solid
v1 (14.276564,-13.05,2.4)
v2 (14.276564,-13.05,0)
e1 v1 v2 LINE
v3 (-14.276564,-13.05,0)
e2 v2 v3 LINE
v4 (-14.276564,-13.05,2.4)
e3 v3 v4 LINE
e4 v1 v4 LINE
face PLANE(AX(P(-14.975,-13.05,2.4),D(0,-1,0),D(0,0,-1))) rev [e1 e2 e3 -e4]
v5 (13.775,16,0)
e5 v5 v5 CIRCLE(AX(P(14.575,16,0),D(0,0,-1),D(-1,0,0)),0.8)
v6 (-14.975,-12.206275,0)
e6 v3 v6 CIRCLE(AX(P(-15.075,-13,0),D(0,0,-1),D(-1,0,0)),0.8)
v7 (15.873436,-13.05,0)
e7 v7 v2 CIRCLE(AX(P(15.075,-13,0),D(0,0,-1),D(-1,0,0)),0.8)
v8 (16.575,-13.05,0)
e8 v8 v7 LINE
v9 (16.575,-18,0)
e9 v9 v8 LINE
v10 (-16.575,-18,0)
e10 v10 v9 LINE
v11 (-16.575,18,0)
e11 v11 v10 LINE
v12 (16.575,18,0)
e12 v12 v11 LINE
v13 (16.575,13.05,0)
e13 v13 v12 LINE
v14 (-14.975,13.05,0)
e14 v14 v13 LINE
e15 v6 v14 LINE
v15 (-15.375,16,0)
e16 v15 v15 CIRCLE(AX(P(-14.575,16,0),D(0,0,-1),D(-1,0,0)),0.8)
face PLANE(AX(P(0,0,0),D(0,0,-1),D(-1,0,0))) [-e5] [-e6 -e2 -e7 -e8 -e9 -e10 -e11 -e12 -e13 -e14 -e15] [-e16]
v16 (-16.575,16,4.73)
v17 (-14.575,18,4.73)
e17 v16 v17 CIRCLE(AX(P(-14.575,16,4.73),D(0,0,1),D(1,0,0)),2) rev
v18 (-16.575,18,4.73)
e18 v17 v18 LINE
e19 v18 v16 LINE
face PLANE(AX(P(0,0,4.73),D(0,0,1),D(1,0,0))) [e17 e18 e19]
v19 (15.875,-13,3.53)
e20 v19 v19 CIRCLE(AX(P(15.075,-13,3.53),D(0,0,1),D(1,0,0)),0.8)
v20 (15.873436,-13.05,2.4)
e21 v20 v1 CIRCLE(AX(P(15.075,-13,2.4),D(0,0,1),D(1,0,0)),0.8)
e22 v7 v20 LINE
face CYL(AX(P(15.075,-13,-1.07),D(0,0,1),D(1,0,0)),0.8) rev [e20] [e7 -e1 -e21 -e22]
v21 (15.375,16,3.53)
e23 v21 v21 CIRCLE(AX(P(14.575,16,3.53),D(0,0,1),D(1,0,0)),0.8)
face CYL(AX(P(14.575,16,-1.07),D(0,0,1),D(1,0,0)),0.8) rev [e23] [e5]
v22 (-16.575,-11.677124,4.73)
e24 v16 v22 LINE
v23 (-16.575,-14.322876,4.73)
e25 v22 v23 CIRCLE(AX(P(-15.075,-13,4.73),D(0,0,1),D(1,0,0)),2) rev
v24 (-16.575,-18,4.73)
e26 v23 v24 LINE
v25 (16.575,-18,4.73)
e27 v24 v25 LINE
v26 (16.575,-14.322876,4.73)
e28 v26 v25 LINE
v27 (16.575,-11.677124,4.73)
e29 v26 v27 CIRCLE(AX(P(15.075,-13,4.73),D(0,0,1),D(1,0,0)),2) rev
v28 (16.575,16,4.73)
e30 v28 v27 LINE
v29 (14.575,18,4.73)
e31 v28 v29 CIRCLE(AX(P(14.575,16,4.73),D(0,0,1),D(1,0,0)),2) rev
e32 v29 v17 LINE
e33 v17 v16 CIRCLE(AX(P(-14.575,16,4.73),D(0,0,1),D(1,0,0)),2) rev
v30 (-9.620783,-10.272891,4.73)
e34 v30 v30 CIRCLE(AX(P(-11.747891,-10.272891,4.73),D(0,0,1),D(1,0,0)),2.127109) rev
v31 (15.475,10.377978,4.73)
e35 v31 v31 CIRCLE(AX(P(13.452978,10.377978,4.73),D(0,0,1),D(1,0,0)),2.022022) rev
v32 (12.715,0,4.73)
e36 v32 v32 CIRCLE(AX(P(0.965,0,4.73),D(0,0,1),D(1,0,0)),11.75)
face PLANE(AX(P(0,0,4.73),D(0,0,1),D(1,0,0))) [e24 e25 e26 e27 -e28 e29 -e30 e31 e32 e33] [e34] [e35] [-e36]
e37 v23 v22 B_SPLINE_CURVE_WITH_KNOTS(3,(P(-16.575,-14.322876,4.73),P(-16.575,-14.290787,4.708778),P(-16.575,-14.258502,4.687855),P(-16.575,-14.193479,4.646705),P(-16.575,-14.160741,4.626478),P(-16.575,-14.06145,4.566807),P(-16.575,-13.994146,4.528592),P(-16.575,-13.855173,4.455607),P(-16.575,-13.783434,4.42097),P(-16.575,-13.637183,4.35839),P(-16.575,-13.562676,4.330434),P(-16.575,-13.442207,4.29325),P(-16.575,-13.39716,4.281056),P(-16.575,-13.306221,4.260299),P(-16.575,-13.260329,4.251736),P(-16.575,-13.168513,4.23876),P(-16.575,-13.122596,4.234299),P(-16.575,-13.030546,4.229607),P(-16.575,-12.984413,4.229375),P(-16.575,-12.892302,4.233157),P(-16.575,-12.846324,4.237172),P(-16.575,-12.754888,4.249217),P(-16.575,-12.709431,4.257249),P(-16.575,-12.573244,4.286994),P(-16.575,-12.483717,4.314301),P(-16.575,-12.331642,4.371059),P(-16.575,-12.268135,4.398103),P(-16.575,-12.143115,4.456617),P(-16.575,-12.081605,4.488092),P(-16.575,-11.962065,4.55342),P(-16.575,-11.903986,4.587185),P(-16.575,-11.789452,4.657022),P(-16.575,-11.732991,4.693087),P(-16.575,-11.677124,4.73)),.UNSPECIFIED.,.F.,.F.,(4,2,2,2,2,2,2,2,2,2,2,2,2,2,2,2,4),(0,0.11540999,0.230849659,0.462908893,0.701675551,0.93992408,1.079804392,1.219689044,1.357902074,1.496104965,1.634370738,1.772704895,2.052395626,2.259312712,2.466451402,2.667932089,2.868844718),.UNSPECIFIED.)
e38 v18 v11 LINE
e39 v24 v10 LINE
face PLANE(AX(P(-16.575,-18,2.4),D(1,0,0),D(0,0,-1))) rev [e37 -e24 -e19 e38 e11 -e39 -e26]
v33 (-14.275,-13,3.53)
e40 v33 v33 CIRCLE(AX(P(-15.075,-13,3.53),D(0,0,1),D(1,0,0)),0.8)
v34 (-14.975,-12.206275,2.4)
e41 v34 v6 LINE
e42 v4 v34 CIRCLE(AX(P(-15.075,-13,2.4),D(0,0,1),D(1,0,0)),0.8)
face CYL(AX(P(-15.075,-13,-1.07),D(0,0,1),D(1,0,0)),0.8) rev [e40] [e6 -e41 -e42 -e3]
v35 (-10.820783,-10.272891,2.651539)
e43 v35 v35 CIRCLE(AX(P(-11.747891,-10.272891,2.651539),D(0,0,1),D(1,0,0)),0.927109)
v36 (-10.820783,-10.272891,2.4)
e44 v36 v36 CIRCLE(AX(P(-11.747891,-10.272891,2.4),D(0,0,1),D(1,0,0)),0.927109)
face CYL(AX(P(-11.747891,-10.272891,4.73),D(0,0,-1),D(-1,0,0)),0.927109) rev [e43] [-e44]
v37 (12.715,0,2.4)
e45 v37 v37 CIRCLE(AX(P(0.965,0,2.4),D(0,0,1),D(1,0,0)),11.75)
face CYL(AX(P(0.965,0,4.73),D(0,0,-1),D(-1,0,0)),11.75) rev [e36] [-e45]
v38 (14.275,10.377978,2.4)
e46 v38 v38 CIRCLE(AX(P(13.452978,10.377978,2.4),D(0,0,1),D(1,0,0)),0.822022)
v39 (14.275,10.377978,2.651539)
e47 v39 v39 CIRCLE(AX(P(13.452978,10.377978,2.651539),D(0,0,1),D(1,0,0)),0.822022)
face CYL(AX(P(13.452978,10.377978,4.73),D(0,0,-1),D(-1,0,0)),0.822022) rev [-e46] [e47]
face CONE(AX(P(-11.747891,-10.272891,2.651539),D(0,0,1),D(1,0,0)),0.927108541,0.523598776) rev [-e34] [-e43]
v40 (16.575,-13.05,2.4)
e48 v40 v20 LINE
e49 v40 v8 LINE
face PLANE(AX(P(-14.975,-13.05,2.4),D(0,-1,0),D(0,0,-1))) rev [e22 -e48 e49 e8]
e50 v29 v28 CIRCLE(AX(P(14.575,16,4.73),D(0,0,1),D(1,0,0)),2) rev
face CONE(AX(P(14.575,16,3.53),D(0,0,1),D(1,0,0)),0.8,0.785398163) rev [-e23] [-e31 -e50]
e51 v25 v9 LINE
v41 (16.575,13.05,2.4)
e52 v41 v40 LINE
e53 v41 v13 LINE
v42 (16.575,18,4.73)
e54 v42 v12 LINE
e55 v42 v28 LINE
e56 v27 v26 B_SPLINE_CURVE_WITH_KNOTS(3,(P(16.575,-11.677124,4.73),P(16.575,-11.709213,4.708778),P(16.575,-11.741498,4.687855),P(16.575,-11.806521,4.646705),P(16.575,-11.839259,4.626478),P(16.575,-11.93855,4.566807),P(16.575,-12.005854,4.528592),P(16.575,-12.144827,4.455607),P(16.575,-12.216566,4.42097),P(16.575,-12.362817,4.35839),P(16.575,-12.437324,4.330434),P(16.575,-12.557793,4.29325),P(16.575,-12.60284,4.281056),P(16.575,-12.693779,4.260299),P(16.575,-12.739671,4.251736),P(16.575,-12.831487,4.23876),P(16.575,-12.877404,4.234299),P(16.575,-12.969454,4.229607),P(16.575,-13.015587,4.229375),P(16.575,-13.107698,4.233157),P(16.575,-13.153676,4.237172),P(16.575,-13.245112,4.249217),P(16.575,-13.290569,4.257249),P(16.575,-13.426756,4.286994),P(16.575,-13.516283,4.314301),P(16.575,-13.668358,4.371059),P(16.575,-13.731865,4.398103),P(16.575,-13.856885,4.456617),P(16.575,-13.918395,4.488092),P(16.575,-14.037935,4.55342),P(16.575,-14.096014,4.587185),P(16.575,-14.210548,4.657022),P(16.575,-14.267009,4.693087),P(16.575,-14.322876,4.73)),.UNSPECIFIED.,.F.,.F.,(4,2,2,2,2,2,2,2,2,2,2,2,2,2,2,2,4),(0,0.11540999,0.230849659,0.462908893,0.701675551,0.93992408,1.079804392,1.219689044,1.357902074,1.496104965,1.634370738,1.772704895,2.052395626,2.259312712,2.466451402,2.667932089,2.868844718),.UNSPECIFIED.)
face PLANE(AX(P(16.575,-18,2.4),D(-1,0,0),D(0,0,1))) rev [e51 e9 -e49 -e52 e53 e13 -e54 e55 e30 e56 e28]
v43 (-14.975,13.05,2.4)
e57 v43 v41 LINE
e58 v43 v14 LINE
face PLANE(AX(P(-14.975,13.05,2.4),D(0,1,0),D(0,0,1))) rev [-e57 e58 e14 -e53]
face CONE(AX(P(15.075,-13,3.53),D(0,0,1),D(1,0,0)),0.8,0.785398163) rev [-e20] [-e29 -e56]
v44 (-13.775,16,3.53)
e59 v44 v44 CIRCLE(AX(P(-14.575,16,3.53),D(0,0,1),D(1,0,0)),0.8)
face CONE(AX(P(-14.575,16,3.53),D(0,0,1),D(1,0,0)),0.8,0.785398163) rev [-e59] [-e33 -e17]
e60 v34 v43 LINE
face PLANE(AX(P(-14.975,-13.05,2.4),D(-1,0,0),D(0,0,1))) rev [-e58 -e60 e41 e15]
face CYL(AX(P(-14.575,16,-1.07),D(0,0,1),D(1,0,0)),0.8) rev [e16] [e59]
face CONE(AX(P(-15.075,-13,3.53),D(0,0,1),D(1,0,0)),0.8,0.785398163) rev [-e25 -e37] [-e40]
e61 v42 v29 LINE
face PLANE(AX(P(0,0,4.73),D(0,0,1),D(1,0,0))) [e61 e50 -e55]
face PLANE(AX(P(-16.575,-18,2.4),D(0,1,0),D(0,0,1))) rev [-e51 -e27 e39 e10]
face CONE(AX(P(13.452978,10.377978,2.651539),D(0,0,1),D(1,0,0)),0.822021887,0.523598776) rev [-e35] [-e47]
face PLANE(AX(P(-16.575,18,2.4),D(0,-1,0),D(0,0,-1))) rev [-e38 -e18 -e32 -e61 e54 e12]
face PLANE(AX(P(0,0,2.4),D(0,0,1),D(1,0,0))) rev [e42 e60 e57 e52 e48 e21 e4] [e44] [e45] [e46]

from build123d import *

# Parameters (mm, degrees)
BOSS_EXTRUDE1_DEPTH = 2.4
SKETCH2_W           = 33.15
SKETCH2_H           = 36
SKETCH2_R           = 11.75
SKETCH2_R_2         = 0.822021887
SKETCH2_R_3         = 0.927108541
BOSS_EXTRUDE2_DEPTH = 2.33
CHAMFER1_SIZE       = 1.2
CHAMFER1_SIZE2      = 2.078460969
SKETCH3_R           = 0.8
CUT_EXTRUDE1_DEPTH  = 5.8
CHAMFER2_SIZE       = 1.2


with BuildPart() as part:
    # Sketch1 → Boss-Extrude1 (new body)
    with BuildSketch(Plane.XY):
        Polygon((-16.575, -18), (16.575, -18), (16.575, -13.05), (-14.975, -13.05), (-14.975, 13.05), (16.575, 13.05), (16.575, 18), (-16.575, 18), align=None)
    extrude(amount=BOSS_EXTRUDE1_DEPTH)

    # Sketch2 → Boss-Extrude2 (add)
    with BuildSketch(Plane.XY.offset(2.4)):
        Rectangle(SKETCH2_W, SKETCH2_H)
        with Locations((0.965, 0)):
            Circle(SKETCH2_R, mode=Mode.SUBTRACT)
        with Locations((13.452978113, 10.377978113)):
            Circle(SKETCH2_R_2, mode=Mode.SUBTRACT)
        with Locations((-11.747891459, -10.272891459)):
            Circle(SKETCH2_R_3, mode=Mode.SUBTRACT)
    extrude(amount=BOSS_EXTRUDE2_DEPTH)

    # Chamfer1
    chamfer1_edges = [part.edges().sort_by_distance(p)[0] for p in [
        (12.630956227, 10.377978113, 4.73),
        (-12.675, -10.272891459, 4.73),
    ]]
    chamfer1_side = [part.faces().sort_by_distance(p)[0] for p in [
        (0, 17.510620546, 4.73),
    ]]
    chamfer(chamfer1_edges, length=CHAMFER1_SIZE, length2=CHAMFER1_SIZE2, reference=chamfer1_side[0])

    # Sketch3 → Cut-Extrude1 (cut)
    with BuildSketch(Plane.XY.offset(4.73)):
        with Locations((-14.575, 16)):
            Circle(SKETCH3_R)
        with Locations(Location((14.575, 16, 0), (0, 0, 180))):
            Circle(SKETCH3_R)
        with Locations((-15.075, -13)):
            Circle(SKETCH3_R)
        with Locations(Location((15.075, -13, 0), (0, 0, 356.416678302))):
            Circle(SKETCH3_R)
    extrude(amount=-CUT_EXTRUDE1_DEPTH, mode=Mode.SUBTRACT)

    # Chamfer2
    # the kernel refuses this chamfer: 1.2 mm, written as the material it takes off along each edge
    with BuildSketch(Plane(origin=(14.575, 16, 4.73), x_dir=(-1, 0, 0), z_dir=(0, 1, 0))) as chamfer2_piece_1:
        Polygon((0.8 + CHAMFER2_SIZE, 0), (0.8, -CHAMFER2_SIZE), (0.8, 0), align=None)
    revolve(axis=Axis((14.575, 16, 4.73), (0, 0, 1)), mode=Mode.SUBTRACT)
    with BuildSketch(Plane(origin=(-15.075, -13, 4.73), x_dir=(1, 0, 0), z_dir=(0, -1, 0))) as chamfer2_piece_2:
        Polygon((0.8 + CHAMFER2_SIZE, 0), (0.8, -CHAMFER2_SIZE), (0.8, 0), align=None)
    revolve(axis=Axis((-15.075, -13, 4.73), (0, 0, 1)), mode=Mode.SUBTRACT)
    with BuildSketch(Plane(origin=(15.075, -13, 4.73), x_dir=(0.9980449639174719, -0.06249999999177853, 0), z_dir=(-0.06249999999177853, -0.9980449639174719, 0))) as chamfer2_piece_3:
        Polygon((0.8 + CHAMFER2_SIZE, 0), (0.8, -CHAMFER2_SIZE), (0.8, 0), align=None)
    revolve(axis=Axis((15.075, -13, 4.73), (0, 0, 1)), mode=Mode.SUBTRACT)
    with BuildSketch(Plane(origin=(-14.575, 16, 4.73), x_dir=(1, 0, 0), z_dir=(0, -1, 0))) as chamfer2_piece_4:
        Polygon((0.8 + CHAMFER2_SIZE, 0), (0.8, -CHAMFER2_SIZE), (0.8, 0), align=None)
    revolve(axis=Axis((-14.575, 16, 4.73), (0, 0, 1)), mode=Mode.SUBTRACT)


solid = part.part
